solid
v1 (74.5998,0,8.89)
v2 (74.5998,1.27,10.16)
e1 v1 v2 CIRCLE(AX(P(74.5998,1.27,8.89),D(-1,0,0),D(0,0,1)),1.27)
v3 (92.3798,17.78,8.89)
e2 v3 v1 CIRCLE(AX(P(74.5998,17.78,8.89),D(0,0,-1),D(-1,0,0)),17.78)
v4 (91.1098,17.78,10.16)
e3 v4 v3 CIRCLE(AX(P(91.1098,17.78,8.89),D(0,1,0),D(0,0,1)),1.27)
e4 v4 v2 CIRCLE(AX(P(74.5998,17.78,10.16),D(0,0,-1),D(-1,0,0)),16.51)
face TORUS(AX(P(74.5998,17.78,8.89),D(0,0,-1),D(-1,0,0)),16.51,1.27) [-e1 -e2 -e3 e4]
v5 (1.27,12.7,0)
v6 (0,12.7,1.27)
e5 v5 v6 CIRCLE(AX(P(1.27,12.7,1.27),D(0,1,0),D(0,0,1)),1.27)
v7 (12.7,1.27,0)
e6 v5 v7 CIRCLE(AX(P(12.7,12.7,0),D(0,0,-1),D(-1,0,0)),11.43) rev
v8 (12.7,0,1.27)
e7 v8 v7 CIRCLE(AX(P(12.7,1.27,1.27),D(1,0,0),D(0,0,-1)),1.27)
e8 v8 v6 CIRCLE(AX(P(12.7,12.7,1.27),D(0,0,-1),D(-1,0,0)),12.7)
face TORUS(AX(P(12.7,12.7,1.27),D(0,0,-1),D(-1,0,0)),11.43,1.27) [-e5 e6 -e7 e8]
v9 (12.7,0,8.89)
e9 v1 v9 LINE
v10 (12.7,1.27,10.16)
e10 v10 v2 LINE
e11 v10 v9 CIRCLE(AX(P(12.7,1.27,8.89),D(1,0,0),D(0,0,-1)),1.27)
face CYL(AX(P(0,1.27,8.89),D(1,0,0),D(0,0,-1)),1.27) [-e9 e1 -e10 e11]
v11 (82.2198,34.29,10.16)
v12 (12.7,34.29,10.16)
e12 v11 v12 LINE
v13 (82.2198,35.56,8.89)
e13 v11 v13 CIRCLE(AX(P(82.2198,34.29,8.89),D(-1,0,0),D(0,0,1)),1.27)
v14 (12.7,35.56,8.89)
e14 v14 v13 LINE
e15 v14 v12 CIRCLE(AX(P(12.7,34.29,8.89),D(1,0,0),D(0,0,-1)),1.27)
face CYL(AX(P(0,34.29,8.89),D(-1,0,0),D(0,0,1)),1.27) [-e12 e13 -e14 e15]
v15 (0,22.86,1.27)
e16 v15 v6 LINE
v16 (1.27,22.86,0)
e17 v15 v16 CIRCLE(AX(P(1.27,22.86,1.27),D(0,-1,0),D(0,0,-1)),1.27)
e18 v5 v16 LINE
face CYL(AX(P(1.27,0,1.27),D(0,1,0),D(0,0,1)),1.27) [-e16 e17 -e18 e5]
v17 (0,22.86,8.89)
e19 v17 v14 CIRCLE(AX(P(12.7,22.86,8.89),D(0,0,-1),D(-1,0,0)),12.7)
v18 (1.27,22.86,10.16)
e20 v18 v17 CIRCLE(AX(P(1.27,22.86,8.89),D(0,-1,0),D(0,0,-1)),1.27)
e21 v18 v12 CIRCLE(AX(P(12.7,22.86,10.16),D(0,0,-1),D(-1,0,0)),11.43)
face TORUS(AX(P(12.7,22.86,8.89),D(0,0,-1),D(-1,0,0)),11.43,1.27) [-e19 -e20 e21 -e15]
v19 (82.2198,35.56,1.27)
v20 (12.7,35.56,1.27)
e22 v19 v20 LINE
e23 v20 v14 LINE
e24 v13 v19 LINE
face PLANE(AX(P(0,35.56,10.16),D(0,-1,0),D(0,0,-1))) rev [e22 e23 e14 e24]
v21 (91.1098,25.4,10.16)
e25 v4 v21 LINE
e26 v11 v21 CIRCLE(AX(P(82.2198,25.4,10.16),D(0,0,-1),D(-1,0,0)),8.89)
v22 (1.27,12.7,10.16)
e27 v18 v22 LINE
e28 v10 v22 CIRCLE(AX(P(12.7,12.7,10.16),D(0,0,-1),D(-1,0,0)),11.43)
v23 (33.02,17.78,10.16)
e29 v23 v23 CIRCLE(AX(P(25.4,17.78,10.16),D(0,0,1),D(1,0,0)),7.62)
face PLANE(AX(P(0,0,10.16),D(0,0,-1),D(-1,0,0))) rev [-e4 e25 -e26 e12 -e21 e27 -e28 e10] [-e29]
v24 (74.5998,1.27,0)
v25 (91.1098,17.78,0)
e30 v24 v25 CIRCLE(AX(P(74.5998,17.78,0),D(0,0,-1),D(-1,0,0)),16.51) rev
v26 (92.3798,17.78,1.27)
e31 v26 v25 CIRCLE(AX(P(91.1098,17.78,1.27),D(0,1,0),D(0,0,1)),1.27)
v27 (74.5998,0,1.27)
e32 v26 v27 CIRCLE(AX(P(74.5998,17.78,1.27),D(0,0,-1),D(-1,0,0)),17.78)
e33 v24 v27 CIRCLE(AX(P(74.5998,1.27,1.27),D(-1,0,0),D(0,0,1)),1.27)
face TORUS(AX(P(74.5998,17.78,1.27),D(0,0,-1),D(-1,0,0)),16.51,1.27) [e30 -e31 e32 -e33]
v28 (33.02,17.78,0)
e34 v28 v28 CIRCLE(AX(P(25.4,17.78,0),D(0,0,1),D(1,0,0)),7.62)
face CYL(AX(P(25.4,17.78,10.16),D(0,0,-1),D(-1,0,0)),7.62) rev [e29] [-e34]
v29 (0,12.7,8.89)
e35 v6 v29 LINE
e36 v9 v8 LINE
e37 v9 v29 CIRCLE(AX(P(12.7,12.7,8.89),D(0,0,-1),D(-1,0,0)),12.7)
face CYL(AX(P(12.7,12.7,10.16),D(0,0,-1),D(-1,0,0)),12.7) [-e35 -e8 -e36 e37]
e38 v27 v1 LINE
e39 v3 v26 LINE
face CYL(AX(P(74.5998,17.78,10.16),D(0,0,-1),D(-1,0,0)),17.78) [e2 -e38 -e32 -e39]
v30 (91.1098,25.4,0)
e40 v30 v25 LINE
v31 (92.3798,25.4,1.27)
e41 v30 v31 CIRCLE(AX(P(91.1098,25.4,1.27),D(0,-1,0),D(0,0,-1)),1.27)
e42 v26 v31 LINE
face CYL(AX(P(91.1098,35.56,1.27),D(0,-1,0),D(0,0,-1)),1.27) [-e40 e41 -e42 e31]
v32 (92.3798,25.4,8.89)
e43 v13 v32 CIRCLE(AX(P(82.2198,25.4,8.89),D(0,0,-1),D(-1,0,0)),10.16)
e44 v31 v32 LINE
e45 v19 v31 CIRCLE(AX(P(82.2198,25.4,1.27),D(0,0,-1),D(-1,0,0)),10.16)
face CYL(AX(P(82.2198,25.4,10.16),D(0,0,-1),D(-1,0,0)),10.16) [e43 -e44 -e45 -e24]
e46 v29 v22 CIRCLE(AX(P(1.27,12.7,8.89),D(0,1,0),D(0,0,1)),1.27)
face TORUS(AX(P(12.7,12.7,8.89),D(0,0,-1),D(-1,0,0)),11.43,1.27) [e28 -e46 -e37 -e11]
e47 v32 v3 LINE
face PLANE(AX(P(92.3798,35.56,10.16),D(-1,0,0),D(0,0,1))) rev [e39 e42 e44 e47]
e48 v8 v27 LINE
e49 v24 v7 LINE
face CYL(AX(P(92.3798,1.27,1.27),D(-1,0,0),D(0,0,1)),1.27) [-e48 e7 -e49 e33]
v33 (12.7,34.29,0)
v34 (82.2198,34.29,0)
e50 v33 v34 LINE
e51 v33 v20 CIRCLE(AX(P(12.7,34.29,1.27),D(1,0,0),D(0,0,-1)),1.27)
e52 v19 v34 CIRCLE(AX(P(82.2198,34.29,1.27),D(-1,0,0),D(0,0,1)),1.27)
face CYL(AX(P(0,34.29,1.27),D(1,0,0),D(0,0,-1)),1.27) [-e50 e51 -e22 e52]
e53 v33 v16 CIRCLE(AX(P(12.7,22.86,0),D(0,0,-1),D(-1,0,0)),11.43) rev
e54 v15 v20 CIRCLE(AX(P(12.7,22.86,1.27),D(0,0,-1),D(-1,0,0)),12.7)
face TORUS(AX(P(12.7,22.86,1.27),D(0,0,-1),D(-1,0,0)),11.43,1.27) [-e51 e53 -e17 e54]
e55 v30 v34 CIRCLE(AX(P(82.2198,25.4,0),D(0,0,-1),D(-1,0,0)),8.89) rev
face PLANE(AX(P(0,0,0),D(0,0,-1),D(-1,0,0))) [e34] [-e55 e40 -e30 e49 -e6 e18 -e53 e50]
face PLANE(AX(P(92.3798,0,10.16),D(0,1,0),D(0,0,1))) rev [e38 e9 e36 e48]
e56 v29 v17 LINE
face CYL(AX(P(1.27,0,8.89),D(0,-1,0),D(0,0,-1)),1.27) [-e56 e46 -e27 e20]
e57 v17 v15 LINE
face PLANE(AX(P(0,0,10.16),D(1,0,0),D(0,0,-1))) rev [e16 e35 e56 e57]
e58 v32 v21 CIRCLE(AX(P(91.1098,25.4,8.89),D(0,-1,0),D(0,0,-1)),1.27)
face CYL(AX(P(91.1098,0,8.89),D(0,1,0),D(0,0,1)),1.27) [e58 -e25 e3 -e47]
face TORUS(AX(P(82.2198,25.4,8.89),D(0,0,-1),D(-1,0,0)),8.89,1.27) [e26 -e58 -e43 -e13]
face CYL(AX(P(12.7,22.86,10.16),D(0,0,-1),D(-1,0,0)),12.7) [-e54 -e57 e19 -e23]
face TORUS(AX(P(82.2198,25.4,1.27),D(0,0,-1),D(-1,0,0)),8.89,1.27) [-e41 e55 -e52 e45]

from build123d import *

# Parameters (mm, degrees)
SKETCH1_W           = 92.3798
SKETCH1_H           = 35.56
SKETCH1_R           = 7.62
BOSS_EXTRUDE1_DEPTH = 10.16
FILLET1_R           = 1.27
FILLET2_R           = 1.27
FILLET3_R           = 17.78
FILLET4_R           = 10.16
FILLET5_R           = 12.7
FILLET6_R           = 12.7


with BuildPart() as part:
    # Sketch1 → Boss-Extrude1 (new body)
    with BuildSketch(Plane.XY):
        with Locations((46.1899, 17.78)):
            Rectangle(SKETCH1_W, SKETCH1_H)
        with Locations((25.4, 17.78)):
            Circle(SKETCH1_R, mode=Mode.SUBTRACT)
    extrude(amount=BOSS_EXTRUDE1_DEPTH)

    # Fillet1
    fillet1_edges = [part.edges().sort_by_distance(p)[0] for p in [
        (46.1899, 35.56, 10.16),
        (0, 17.78, 10.16),
        (46.1899, 0, 10.16),
        (92.3798, 17.78, 10.16),
    ]]
    fillet(fillet1_edges, radius=FILLET1_R)

    # Fillet2
    fillet2_edges = [part.edges().sort_by_distance(p)[0] for p in [
        (0, 17.78, 0),
        (46.1899, 35.56, 0),
        (92.3798, 17.78, 0),
        (46.1899, 0, 0),
    ]]
    fillet(fillet2_edges, radius=FILLET2_R)

    # Fillet3
    # the kernel refuses this fillet: 17.78 mm, written as the material it takes off along each edge
    with BuildSketch(Plane(origin=(74.5998, 17.78, 10.16), x_dir=(0, -1, 0), z_dir=(-1, 0, 0))) as fillet3_piece_1:
        with BuildLine():
            CenterArc((16.51, -1.27), 1.27, 0, 90)
            Line((17.78, -1.27), (17.78, 0))
            Line((17.78, 0), (16.51, 0))
        make_face()
    revolve(axis=Axis((74.5998, 17.78, 10.16), (0, 0, 1)), revolution_arc=90, mode=Mode.SUBTRACT)
    with BuildSketch(Plane(origin=(74.5998, 17.78, 0), x_dir=(1, 0, 0), z_dir=(0, 1, 0))) as fillet3_piece_2:
        with BuildLine():
            CenterArc((16.51, -1.27), 1.27, 0, 90)
            Line((17.78, -1.27), (17.78, 0))
            Line((17.78, 0), (16.51, 0))
        make_face()
    revolve(axis=Axis((74.5998, 17.78, 0), (0, 0, -1)), revolution_arc=90, mode=Mode.SUBTRACT)
    with BuildSketch(Plane(origin=(92.3798, 0, 0), x_dir=(-1, 0, 0), z_dir=(0, 0, 1))) as fillet3_piece_3:
        with BuildLine():
            CenterArc((FILLET3_R, -FILLET3_R), FILLET3_R, 90, 90)
            Line((0, -FILLET3_R), (0, 0))
            Line((0, 0), (FILLET3_R, 0))
        make_face()
    extrude(amount=10.16, mode=Mode.SUBTRACT)

    # Fillet4
    # the kernel refuses this fillet: 10.16 mm, written as the material it takes off along each edge
    with BuildSketch(Plane(origin=(82.2198, 25.4, 10.16), x_dir=(1, 0, 0), z_dir=(0, -1, 0))) as fillet4_piece_1:
        with BuildLine():
            CenterArc((8.89, -1.27), 1.27, 0, 90)
            Line((10.16, -1.27), (10.16, 0))
            Line((10.16, 0), (8.89, 0))
        make_face()
    revolve(axis=Axis((82.2198, 25.4, 10.16), (0, 0, 1)), revolution_arc=90, mode=Mode.SUBTRACT)
    with BuildSketch(Plane(origin=(82.2198, 25.4, 0), x_dir=(0, 1, 0), z_dir=(-1, 0, 0))) as fillet4_piece_2:
        with BuildLine():
            CenterArc((8.89, -1.27), 1.27, 0, 90)
            Line((10.16, -1.27), (10.16, 0))
            Line((10.16, 0), (8.89, 0))
        make_face()
    revolve(axis=Axis((82.2198, 25.4, 0), (0, 0, -1)), revolution_arc=90, mode=Mode.SUBTRACT)
    with BuildSketch(Plane(origin=(92.3798, 35.56, 0), x_dir=(-1, 0, 0), z_dir=(0, 0, 1))) as fillet4_piece_3:
        with BuildLine():
            CenterArc((FILLET4_R, FILLET4_R), FILLET4_R, 180, 90)
            Line((0, FILLET4_R), (0, 0))
            Line((0, 0), (FILLET4_R, 0))
        make_face()
    extrude(amount=10.16, mode=Mode.SUBTRACT)

    # Fillet5
    # the kernel refuses this fillet: 12.7 mm, written as the material it takes off along each edge
    with BuildSketch(Plane(origin=(12.7, 22.86, 10.16), x_dir=(0, 1, 0), z_dir=(1, 0, 0))) as fillet5_piece_1:
        with BuildLine():
            CenterArc((11.43, -1.27), 1.27, 0, 90)
            Line((12.7, -1.27), (12.7, 0))
            Line((12.7, 0), (11.43, 0))
        make_face()
    revolve(axis=Axis((12.7, 22.86, 10.16), (0, 0, 1)), revolution_arc=90, mode=Mode.SUBTRACT)
    with BuildSketch(Plane(origin=(12.7, 22.86, 0), x_dir=(-1, 0, 0), z_dir=(0, -1, 0))) as fillet5_piece_2:
        with BuildLine():
            CenterArc((11.43, -1.27), 1.27, 0, 90)
            Line((12.7, -1.27), (12.7, 0))
            Line((12.7, 0), (11.43, 0))
        make_face()
    revolve(axis=Axis((12.7, 22.86, 0), (0, 0, -1)), revolution_arc=90, mode=Mode.SUBTRACT)
    with BuildSketch(Plane(origin=(0, 35.56, 0), x_dir=(0, -1, 0), z_dir=(0, 0, 1))) as fillet5_piece_3:
        with BuildLine():
            CenterArc((FILLET5_R, FILLET5_R), FILLET5_R, 180, 90)
            Line((0, FILLET5_R), (0, 0))
            Line((0, 0), (FILLET5_R, 0))
        make_face()
    extrude(amount=10.16, mode=Mode.SUBTRACT)

    # Fillet6
    # the kernel refuses this fillet: 12.7 mm, written as the material it takes off along each edge
    with BuildSketch(Plane(origin=(12.7, 12.7, 10.16), x_dir=(-1, 0, 0), z_dir=(0, 1, 0))) as fillet6_piece_1:
        with BuildLine():
            CenterArc((11.43, -1.27), 1.27, 0, 90)
            Line((12.7, -1.27), (12.7, 0))
            Line((12.7, 0), (11.43, 0))
        make_face()
    revolve(axis=Axis((12.7, 12.7, 10.16), (0, 0, 1)), revolution_arc=90, mode=Mode.SUBTRACT)
    with BuildSketch(Plane(origin=(12.7, 12.7, 0), x_dir=(0, -1, 0), z_dir=(1, 0, 0))) as fillet6_piece_2:
        with BuildLine():
            CenterArc((11.43, -1.27), 1.27, 0, 90)
            Line((12.7, -1.27), (12.7, 0))
            Line((12.7, 0), (11.43, 0))
        make_face()
    revolve(axis=Axis((12.7, 12.7, 0), (0, 0, -1)), revolution_arc=90, mode=Mode.SUBTRACT)
    with BuildSketch(Plane(origin=(0, 0, 0), x_dir=(0, 1, 0), z_dir=(0, 0, 1))) as fillet6_piece_3:
        with BuildLine():
            CenterArc((FILLET6_R, -FILLET6_R), FILLET6_R, 90, 90)
            Line((0, -FILLET6_R), (0, 0))
            Line((0, 0), (FILLET6_R, 0))
        make_face()
    extrude(amount=10.16, mode=Mode.SUBTRACT)


solid = part.part
